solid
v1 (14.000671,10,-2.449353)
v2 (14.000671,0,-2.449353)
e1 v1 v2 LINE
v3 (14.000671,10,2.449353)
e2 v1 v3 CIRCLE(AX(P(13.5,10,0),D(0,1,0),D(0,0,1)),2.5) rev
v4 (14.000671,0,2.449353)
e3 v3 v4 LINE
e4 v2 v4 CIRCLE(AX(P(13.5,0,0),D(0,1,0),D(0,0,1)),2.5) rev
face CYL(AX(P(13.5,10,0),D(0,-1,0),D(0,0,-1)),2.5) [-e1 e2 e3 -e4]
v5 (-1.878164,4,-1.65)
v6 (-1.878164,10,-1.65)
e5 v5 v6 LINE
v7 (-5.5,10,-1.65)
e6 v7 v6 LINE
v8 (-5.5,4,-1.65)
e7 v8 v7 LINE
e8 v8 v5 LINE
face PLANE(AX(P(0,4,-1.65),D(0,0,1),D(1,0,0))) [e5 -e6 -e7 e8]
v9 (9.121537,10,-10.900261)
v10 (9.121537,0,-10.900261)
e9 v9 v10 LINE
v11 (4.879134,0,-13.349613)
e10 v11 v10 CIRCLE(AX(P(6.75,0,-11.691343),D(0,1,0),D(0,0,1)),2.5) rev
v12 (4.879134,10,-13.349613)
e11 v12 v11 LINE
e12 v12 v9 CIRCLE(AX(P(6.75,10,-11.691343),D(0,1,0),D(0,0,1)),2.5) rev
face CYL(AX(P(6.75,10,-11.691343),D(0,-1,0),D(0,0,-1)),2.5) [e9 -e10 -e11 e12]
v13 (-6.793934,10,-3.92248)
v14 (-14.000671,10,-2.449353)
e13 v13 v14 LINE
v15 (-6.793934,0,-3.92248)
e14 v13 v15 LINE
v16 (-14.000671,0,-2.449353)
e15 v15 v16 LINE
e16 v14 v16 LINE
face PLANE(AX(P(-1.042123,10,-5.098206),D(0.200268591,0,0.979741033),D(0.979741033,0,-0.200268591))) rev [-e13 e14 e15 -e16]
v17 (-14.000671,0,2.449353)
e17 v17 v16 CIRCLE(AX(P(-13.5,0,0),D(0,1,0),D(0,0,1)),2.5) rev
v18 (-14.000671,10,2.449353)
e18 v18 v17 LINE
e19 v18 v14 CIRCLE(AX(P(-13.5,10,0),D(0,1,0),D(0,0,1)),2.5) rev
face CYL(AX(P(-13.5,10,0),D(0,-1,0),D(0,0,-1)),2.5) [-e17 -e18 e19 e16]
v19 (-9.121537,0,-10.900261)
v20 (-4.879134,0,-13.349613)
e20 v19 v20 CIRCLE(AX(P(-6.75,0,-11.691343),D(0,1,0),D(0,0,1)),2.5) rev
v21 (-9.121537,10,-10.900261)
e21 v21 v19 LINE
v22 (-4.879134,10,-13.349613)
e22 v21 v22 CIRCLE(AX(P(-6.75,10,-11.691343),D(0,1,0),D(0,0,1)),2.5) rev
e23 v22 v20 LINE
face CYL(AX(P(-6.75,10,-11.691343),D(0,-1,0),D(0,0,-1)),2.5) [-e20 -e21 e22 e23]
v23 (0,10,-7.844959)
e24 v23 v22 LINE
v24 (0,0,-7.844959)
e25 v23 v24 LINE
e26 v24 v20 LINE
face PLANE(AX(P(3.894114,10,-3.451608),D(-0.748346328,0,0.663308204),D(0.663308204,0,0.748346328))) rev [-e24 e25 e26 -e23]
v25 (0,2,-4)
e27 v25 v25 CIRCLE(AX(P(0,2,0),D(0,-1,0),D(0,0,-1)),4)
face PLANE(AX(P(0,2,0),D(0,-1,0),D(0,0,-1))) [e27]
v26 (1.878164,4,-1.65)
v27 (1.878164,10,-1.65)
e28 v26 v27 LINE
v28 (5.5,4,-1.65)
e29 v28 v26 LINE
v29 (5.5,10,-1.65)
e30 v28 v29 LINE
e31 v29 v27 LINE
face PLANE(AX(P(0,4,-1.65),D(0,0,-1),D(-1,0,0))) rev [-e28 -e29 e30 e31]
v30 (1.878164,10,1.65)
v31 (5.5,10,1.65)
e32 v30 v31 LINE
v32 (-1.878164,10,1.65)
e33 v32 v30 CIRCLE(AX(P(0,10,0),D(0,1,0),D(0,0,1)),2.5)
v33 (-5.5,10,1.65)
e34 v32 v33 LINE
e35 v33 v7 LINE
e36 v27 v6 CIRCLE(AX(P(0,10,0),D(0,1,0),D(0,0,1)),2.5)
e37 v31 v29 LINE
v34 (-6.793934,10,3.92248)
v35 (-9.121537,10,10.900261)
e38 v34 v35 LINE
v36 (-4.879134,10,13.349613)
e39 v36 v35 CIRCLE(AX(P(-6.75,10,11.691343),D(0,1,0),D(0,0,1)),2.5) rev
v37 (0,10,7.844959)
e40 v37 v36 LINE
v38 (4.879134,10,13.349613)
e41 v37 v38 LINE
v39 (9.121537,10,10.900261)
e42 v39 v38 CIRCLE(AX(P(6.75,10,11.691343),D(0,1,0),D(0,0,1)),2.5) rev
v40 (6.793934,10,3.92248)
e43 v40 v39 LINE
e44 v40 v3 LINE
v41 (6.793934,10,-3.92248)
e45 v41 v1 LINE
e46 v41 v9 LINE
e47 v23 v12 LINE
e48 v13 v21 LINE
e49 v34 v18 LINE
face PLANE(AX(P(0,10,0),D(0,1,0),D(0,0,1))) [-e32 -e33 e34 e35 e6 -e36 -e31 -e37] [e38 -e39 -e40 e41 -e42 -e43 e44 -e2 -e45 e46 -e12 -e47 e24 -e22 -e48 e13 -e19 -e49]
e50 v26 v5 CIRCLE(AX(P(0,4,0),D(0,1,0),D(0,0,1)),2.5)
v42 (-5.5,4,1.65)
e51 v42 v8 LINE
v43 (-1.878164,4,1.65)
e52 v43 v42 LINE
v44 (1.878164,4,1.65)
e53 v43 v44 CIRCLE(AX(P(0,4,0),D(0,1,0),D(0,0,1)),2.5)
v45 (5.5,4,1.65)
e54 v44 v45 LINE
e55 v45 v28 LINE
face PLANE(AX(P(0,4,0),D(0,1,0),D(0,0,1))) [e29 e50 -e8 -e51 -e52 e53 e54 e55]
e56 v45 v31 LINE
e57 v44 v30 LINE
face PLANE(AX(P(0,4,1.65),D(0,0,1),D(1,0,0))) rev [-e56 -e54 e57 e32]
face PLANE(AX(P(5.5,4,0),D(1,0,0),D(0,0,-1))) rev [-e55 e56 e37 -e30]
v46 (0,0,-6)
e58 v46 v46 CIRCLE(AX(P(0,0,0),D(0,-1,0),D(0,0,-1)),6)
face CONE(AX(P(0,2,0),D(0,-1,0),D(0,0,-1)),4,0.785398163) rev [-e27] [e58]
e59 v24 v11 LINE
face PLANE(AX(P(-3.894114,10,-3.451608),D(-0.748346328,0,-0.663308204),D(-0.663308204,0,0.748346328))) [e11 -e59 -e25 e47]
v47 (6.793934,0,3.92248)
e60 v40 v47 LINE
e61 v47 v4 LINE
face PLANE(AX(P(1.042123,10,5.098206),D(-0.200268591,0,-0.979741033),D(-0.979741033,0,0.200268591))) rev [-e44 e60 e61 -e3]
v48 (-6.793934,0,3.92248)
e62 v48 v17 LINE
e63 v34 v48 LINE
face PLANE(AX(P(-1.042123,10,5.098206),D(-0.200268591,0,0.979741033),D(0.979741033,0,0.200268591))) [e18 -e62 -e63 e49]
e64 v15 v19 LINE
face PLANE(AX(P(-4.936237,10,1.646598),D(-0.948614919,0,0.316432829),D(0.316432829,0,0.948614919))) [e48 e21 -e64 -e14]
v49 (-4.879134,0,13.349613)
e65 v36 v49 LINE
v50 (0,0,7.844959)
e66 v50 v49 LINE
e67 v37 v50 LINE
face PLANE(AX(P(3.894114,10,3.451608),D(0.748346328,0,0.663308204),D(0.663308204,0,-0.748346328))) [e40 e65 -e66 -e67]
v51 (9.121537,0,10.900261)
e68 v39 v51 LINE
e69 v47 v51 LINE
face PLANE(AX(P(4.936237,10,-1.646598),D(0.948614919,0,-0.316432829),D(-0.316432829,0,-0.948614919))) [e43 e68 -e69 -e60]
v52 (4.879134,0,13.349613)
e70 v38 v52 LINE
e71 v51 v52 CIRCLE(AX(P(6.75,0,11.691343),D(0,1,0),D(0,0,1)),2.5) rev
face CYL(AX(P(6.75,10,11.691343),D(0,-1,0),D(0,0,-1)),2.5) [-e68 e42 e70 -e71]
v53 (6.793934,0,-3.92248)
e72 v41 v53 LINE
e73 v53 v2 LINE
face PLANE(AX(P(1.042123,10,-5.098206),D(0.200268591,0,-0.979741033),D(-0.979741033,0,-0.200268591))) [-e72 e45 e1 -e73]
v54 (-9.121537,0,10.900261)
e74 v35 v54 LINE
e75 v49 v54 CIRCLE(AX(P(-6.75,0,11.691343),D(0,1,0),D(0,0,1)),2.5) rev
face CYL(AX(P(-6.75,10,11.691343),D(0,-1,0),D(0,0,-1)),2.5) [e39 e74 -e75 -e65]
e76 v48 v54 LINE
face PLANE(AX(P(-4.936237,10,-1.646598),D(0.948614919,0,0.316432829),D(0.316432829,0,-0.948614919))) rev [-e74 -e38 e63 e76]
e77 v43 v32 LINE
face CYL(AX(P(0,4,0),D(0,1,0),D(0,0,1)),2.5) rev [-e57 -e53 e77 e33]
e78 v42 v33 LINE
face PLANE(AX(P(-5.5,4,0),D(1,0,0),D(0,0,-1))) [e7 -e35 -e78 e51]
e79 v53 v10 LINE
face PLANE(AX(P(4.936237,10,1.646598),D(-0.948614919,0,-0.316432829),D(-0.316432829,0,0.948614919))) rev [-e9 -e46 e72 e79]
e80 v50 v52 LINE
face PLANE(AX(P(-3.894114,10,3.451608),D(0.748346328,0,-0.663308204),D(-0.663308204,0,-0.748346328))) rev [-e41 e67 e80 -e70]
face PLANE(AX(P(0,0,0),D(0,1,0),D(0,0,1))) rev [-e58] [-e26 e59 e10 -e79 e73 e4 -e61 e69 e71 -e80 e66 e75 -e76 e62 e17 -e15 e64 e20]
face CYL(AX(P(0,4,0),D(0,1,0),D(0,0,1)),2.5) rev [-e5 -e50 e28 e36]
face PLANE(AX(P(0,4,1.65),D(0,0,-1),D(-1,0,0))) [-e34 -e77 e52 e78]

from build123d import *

# Parameters (mm, degrees)
BOSS_EXTRUDE1_DEPTH = 10
CUT_EXTRUDE1_DEPTH  = 6
SKETCH3_R           = 6
CUT_EXTRUDE2_DEPTH  = 2
CHAMFER1_SIZE       = 2


with BuildPart() as part:
    # Sketch1 → Boss-Extrude1 (new body)
    with BuildSketch(Plane(origin=(0, 0, 0), x_dir=(1, 0, 0), z_dir=(0, 1, 0))):
        with BuildLine():
            ThreePointArc((4.87913418, -13.349613461), (8, -13.856406461), (9.121537298, -10.900260879))
            Line((9.121537298, -10.900260879), (6.793934197, -3.922479738))
            Line((6.793934197, -3.922479738), (14.000671478, -2.449352582))
            ThreePointArc((14.000671478, -2.449352582), (16, 0), (14.000671478, 2.449352582))
            Line((14.000671478, 2.449352582), (6.793934197, 3.922479738))
            Line((6.793934197, 3.922479738), (9.121537298, 10.900260879))
            ThreePointArc((9.121537298, 10.900260879), (8, 13.856406461), (4.87913418, 13.349613461))
            Line((4.87913418, 13.349613461), (0, 7.844959475))
            Line((0, 7.844959475), (-4.87913418, 13.349613461))
            ThreePointArc((-4.87913418, 13.349613461), (-8, 13.856406461), (-9.121537298, 10.900260879))
            Line((-9.121537298, 10.900260879), (-6.793934197, 3.922479738))
            Line((-6.793934197, 3.922479738), (-14.000671478, 2.449352582))
            ThreePointArc((-14.000671478, 2.449352582), (-16, 0), (-14.000671478, -2.449352582))
            Line((-14.000671478, -2.449352582), (-6.793934197, -3.922479738))
            Line((-6.793934197, -3.922479738), (-9.121537298, -10.900260879))
            ThreePointArc((-9.121537298, -10.900260879), (-8, -13.856406461), (-4.87913418, -13.349613461))
            Line((-4.87913418, -13.349613461), (0, -7.844959475))
            Line((0, -7.844959475), (4.87913418, -13.349613461))
        make_face()
    extrude(amount=BOSS_EXTRUDE1_DEPTH)

    # Sketch2 → Cut-Extrude1 (cut)
    # profile 1 of 2: a face of its own
    with BuildSketch(Plane(origin=(0, 10, 0), x_dir=(1, 0, 0), z_dir=(0, 1, 0))):
        with BuildLine():
            Line((-1.878163997, -1.65), (-5.5, -1.65))
            Line((-5.5, -1.65), (-5.5, 1.65))
            Line((-5.5, 1.65), (-1.878163997, 1.65))
            ThreePointArc((-1.878163997, 1.65), (0, 2.5), (1.878163997, 1.65))
            Line((1.878163997, 1.65), (5.5, 1.65))
            Line((5.5, 1.65), (5.5, -1.65))
            Line((5.5, -1.65), (1.878163997, -1.65))
            ThreePointArc((1.878163997, -1.65), (0, -2.5), (-1.878163997, -1.65))
        make_face()
        with BuildLine():
            ThreePointArc((1.809005252, 1.5), (0, 2.35), (-1.809005252, 1.5))
            Line((-1.809005252, 1.5), (-5.35, 1.5))
            Line((-5.35, 1.5), (-5.35, -1.5))
            Line((-5.35, -1.5), (-1.809005252, -1.5))
            ThreePointArc((-1.809005252, -1.5), (0, -2.35), (1.809005252, -1.5))
            Line((1.809005252, -1.5), (5.35, -1.5))
            Line((5.35, -1.5), (5.35, 1.5))
            Line((5.35, 1.5), (1.809005252, 1.5))
        make_face(mode=Mode.SUBTRACT)
    # profile 2 of 2: a face of its own
    with BuildSketch(Plane(origin=(0, 10, 0), x_dir=(1, 0, 0), z_dir=(0, 1, 0))):
        with BuildLine():
            Line((5.35, 1.5), (1.809005252, 1.5))
            ThreePointArc((1.809005252, 1.5), (0, 2.35), (-1.809005252, 1.5))
            Line((-1.809005252, 1.5), (-5.35, 1.5))
            Line((-5.35, 1.5), (-5.35, -1.5))
            Line((-5.35, -1.5), (-1.809005252, -1.5))
            ThreePointArc((-1.809005252, -1.5), (0, -2.35), (1.809005252, -1.5))
            Line((1.809005252, -1.5), (5.35, -1.5))
            Line((5.35, -1.5), (5.35, 1.5))
        make_face()
    extrude(amount=-CUT_EXTRUDE1_DEPTH, mode=Mode.SUBTRACT)

    # Sketch3 → Cut-Extrude2 (cut)
    with BuildSketch(Plane.XZ):
        with Locations(Location((0, 0, 0), (0, 0, 270))):
            Circle(SKETCH3_R)
    extrude(amount=-CUT_EXTRUDE2_DEPTH, mode=Mode.SUBTRACT)

    # Chamfer1
    chamfer1_edges = [part.edges().sort_by_distance(p)[0] for p in [
        (0, 2, 6),
    ]]
    chamfer(chamfer1_edges, length=CHAMFER1_SIZE - 0.0001)  # a hair under: the kernel refuses the full size


solid = part.part
